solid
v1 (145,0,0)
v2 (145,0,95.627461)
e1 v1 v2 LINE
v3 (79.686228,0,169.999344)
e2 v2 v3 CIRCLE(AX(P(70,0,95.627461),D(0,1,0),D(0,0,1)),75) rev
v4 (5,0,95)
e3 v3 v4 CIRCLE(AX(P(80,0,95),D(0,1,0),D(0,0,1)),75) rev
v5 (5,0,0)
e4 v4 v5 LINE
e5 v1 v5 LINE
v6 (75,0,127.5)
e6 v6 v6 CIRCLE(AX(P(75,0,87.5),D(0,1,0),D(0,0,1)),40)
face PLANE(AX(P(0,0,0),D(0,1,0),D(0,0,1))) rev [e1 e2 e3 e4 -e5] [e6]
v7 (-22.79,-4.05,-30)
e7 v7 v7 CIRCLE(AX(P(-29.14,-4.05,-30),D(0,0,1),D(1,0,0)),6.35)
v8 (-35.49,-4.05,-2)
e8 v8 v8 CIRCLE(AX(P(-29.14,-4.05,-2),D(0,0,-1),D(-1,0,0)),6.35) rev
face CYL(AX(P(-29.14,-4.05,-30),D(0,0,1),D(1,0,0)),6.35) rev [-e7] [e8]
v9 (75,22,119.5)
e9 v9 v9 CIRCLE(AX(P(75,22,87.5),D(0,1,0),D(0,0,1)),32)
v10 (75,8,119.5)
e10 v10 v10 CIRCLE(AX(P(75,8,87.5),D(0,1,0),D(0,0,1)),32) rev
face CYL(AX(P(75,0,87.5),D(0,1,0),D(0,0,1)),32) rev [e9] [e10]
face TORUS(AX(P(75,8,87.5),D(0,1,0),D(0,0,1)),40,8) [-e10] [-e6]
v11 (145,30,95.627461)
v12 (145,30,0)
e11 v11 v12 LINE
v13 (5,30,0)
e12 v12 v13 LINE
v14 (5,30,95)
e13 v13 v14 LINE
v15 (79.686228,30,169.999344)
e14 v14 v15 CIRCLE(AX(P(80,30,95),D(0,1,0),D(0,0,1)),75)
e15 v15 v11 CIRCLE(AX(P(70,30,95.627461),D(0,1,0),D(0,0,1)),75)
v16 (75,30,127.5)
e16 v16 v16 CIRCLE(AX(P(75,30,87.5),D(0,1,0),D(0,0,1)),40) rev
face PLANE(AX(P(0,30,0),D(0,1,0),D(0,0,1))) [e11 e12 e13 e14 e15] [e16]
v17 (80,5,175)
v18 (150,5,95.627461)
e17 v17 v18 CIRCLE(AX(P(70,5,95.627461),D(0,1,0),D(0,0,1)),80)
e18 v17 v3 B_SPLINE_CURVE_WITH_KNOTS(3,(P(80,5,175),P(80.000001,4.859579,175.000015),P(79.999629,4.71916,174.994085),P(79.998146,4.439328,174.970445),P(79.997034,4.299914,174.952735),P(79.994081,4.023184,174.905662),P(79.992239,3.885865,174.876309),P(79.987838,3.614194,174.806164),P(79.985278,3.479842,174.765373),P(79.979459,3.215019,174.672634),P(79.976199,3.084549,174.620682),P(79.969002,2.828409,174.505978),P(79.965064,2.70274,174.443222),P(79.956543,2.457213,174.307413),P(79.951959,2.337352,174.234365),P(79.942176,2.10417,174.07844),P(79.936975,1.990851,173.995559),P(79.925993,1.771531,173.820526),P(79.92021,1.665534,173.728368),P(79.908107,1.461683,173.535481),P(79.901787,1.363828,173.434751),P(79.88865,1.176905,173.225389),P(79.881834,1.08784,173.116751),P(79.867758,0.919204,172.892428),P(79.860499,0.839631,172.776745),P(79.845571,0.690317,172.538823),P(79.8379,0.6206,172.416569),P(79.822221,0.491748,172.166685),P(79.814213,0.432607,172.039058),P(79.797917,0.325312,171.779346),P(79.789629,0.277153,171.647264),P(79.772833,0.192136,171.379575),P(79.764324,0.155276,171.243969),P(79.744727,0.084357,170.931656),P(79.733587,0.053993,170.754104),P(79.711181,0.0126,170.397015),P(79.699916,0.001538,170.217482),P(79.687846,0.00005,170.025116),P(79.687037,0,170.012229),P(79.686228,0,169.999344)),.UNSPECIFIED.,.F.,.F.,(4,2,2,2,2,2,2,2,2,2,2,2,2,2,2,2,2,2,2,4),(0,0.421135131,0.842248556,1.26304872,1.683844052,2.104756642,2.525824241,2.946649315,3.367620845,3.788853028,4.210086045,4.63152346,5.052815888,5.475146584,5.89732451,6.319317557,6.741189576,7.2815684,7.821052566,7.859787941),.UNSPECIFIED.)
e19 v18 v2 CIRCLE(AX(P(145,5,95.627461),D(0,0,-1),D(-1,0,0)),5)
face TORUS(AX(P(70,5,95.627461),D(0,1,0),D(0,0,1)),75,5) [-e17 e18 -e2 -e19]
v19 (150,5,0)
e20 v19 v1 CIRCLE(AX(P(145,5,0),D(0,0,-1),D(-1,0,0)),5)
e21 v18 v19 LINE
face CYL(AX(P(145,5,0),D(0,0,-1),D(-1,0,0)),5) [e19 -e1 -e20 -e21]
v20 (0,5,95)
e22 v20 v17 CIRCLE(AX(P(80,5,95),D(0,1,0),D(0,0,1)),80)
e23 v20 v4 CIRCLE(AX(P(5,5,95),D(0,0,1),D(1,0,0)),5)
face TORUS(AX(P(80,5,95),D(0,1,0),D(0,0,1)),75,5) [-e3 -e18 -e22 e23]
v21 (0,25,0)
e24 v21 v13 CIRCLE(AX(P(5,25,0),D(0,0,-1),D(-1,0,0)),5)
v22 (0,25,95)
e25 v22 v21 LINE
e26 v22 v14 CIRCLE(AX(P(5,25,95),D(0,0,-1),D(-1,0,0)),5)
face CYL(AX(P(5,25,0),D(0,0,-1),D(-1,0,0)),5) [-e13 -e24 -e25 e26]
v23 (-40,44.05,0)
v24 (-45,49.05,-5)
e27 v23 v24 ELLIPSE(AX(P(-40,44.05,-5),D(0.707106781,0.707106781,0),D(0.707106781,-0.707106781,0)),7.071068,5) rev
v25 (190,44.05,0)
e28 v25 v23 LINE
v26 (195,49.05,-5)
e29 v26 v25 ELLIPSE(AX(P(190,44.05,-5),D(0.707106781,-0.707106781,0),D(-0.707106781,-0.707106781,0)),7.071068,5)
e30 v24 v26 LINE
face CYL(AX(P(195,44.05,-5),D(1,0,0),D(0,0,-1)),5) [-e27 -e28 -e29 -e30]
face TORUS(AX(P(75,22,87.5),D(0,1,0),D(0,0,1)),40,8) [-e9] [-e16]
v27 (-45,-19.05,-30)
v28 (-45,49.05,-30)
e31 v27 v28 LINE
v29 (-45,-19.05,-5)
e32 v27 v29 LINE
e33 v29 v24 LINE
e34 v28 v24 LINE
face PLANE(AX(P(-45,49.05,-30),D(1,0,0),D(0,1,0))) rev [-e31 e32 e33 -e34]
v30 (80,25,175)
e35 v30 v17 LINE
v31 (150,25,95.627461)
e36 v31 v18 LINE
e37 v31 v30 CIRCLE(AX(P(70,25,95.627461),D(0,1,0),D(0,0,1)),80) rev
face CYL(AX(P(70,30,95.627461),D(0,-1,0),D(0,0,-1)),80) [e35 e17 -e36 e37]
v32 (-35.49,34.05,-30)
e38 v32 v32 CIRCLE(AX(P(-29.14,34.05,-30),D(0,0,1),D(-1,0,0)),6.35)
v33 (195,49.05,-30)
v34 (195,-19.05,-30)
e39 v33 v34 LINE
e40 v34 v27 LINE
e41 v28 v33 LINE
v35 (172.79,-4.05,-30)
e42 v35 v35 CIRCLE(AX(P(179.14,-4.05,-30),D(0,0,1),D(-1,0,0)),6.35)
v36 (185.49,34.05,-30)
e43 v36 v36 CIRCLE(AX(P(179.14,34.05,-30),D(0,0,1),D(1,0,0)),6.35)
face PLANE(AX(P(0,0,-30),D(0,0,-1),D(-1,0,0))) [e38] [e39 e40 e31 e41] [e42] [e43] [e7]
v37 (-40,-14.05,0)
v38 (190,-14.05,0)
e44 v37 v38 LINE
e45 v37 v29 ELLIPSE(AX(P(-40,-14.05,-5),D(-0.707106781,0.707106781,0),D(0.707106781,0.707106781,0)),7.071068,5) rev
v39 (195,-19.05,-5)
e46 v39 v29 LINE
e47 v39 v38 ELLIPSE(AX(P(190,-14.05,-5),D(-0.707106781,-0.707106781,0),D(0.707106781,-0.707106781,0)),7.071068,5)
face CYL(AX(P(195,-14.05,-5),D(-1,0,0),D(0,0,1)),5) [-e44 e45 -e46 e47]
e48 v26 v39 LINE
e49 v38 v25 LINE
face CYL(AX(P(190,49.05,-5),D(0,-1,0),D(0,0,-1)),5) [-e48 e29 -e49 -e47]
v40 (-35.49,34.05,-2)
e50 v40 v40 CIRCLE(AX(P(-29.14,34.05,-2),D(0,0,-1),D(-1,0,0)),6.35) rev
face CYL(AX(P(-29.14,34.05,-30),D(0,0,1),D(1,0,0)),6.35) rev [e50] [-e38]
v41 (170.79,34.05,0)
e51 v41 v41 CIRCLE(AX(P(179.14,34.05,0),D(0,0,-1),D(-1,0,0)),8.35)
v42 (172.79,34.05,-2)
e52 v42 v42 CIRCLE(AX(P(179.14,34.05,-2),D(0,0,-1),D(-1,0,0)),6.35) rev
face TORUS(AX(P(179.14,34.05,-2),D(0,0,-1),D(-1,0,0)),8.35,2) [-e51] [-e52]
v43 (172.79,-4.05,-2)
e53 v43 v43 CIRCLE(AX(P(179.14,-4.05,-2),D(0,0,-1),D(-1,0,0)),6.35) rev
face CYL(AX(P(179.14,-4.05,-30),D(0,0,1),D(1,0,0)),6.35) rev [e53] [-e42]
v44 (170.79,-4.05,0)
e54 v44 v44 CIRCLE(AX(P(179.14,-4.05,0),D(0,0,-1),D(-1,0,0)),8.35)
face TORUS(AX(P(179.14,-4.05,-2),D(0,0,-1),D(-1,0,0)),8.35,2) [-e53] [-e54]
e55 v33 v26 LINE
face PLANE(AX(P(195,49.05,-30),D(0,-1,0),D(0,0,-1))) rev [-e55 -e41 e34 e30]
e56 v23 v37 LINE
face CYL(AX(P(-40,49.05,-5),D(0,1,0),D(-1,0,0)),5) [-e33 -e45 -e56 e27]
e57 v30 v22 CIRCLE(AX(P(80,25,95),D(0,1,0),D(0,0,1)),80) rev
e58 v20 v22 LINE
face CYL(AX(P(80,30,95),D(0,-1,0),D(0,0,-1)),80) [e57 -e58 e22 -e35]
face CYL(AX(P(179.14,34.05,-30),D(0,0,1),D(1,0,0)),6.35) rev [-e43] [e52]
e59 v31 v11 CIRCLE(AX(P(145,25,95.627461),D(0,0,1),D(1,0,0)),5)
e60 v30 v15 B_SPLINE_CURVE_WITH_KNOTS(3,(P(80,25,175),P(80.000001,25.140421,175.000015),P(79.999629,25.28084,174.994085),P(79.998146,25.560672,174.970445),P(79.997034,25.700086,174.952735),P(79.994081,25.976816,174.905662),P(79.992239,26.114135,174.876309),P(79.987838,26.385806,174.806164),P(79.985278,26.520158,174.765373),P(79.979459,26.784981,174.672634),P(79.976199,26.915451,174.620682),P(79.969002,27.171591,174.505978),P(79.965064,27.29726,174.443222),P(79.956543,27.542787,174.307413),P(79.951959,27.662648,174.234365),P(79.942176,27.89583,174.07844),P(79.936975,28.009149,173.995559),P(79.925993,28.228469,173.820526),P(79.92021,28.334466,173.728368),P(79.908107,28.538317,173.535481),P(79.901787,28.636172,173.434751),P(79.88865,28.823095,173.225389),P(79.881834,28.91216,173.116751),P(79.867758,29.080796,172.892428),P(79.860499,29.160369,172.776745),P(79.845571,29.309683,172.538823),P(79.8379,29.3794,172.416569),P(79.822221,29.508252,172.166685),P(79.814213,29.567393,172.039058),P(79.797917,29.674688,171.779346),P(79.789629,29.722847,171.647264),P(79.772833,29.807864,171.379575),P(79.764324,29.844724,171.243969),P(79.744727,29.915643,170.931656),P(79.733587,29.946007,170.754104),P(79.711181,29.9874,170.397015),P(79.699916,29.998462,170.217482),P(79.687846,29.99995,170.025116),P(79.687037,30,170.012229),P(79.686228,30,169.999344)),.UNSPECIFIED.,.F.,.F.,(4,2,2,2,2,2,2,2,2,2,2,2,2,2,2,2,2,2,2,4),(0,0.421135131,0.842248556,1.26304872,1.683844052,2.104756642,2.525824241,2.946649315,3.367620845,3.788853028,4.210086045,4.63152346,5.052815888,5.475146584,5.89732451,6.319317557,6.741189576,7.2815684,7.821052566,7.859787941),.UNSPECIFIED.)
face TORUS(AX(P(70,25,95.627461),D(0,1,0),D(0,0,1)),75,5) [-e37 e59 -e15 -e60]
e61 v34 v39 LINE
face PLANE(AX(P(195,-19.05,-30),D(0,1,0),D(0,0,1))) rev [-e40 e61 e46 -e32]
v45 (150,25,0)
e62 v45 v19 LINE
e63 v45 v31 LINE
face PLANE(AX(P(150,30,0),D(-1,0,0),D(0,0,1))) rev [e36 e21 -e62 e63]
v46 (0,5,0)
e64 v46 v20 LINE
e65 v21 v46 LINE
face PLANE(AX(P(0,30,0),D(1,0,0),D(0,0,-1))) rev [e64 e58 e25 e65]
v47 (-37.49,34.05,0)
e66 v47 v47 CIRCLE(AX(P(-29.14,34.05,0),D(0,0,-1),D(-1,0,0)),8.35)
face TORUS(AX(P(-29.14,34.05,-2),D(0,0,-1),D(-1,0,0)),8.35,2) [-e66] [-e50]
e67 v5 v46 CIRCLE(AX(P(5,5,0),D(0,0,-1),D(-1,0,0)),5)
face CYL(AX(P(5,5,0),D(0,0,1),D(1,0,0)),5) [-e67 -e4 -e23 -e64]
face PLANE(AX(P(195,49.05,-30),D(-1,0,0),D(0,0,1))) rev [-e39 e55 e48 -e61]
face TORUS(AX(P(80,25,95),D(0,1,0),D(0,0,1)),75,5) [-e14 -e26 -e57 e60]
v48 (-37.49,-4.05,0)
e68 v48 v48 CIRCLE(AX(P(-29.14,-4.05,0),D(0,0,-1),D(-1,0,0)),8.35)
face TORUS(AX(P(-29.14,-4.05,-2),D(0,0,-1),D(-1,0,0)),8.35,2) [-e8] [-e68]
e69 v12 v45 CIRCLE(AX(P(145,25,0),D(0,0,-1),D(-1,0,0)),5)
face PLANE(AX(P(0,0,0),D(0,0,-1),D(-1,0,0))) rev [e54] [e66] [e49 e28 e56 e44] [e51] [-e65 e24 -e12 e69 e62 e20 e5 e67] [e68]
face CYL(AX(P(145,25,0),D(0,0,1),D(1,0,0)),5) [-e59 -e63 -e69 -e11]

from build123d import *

# Parameters (mm, degrees)
SKETCH1_W           = 150
SKETCH1_H           = 175
BOSS_EXTRUDE1_DEPTH = 30
SKETCH3_R           = 32
CUT_EXTRUDE2_DEPTH  = 233.432785983
FILLET1_R           = 80
FILLET2_R           = 80
FILLET3_R           = 8
FILLET4_R           = 8
SKETCH5_W           = 240
SKETCH5_H           = 68.1
BOSS_EXTRUDE5_DEPTH = 30
FILLET5_R           = 5
FILLET6_R           = 5
SKETCH7_R           = 6.35
CUT_EXTRUDE3_DEPTH  = 267.563130487
FILLET7_R           = 2


with BuildPart() as part:
    # Sketch1 → Boss-Extrude1 (new body)
    with BuildSketch(Plane(origin=(0, 0, 0), x_dir=(1, 0, 0), z_dir=(0, 1, 0))):
        with Locations((75, -87.5)):
            Rectangle(SKETCH1_W, SKETCH1_H)
    extrude(amount=BOSS_EXTRUDE1_DEPTH)

    # Sketch3 → Cut-Extrude2 (cut, through all)
    with BuildSketch(Plane(origin=(0, 30, 0), x_dir=(-1, 0, 0), z_dir=(0, 1, 0))):
        with Locations(Location((-75, 87.5, 0), (0, 0, 90))):
            Circle(SKETCH3_R)
    extrude(amount=-CUT_EXTRUDE2_DEPTH, mode=Mode.SUBTRACT)

    # Fillet1
    fillet1_edges = [part.edges().sort_by_distance(p)[0] for p in [
        (0, 15, 175),
    ]]
    fillet(fillet1_edges, radius=FILLET1_R)

    # Fillet2
    # the kernel refuses this fillet: 80 mm, written as the material it takes off along each edge
    with BuildSketch(Plane(origin=(150, -198.43134833, 175), x_dir=(-1, 0, 0), z_dir=(0, 1, 0))) as fillet2_piece_1:
        with BuildLine():
            CenterArc((80, -79.372539332), FILLET2_R, 97.180755781, 82.819244219)
            Line((0, -79.372539332), (-1.6, -79.372539332))
            Line((-1.6, -79.372539332), (-1.6, 0))
            Line((-1.6, 0), (0, 1.6))
            ThreePointArc((0, 1.6), (35, 1.6), (69.8, 1.587450787))
            Line((69.8, 1.587450787), (70, 0))
        make_face()
    extrude(amount=426.86269666, mode=Mode.SUBTRACT)

    # Fillet3
    fillet3_edges = [part.edges().sort_by_distance(p)[0] for p in [
        (75, 30, 55.5),
    ]]
    fillet(fillet3_edges, radius=FILLET3_R)

    # Fillet4
    fillet4_edges = [part.edges().sort_by_distance(p)[0] for p in [
        (75, 0, 55.5),
    ]]
    fillet(fillet4_edges, radius=FILLET4_R)

    # Sketch5 → Boss-Extrude5 (add)
    with BuildSketch(Plane(origin=(0, 0, 0), x_dir=(-1, 0, 0), z_dir=(0, 0, -1))):
        with Locations((-75, 15)):
            Rectangle(SKETCH5_W, SKETCH5_H)
    extrude(amount=BOSS_EXTRUDE5_DEPTH)

    # Fillet5
    fillet5_edges = [part.edges().sort_by_distance(p)[0] for p in [
        (195, 15, 0),
        (75, -19.05, 0),
        (-45, 15, 0),
        (75, 49.05, 0),
    ]]
    fillet(fillet5_edges, radius=FILLET5_R)

    # Fillet6
    # the kernel refuses this fillet: 5 mm, written as the material it takes off along each edge
    with BuildSketch(Plane(origin=(80, 0, 95), x_dir=(-1, 0, 0), z_dir=(0, 0, -1))) as fillet6_piece_1:
        with BuildLine():
            CenterArc((80 - FILLET6_R, FILLET6_R), FILLET6_R, 270, 90)
            Line((80, FILLET6_R), (80, 0))
            Line((80, 0), (80 - FILLET6_R, 0))
        make_face()
    revolve(axis=Axis((80, 0, 95), (0, 1, 0)), revolution_arc=134.780309137, mode=Mode.SUBTRACT)
    with BuildSketch(Plane(origin=(80, 30, 95), x_dir=(-1, 0, 0), z_dir=(0, 0, -1))) as fillet6_piece_2:
        with BuildLine():
            CenterArc((80 - FILLET6_R, -FILLET6_R), FILLET6_R, 0, 90)
            Line((80, -FILLET6_R), (80, 0))
            Line((80, 0), (80 - FILLET6_R, 0))
        make_face()
    revolve(axis=Axis((80, 30, 95), (0, 1, 0)), revolution_arc=134.780309137, mode=Mode.SUBTRACT)
    with BuildSketch(Plane(origin=(150, 0, 0), x_dir=(-1, 0, 0), z_dir=(0, 0, 1)), Plane(origin=(150, 30, 0), x_dir=(0, -1, 0), z_dir=(0, 0, 1))) as fillet6_piece_3:
        with BuildLine():
            CenterArc((FILLET6_R, -FILLET6_R), FILLET6_R, 90, 90)
            Line((0, -FILLET6_R), (0, 0))
            Line((0, 0), (FILLET6_R, 0))
        make_face()
    extrude(amount=95.627460668, mode=Mode.SUBTRACT)
    with BuildSketch(Plane(origin=(70, 0, 95.627460668), x_dir=(1, 0, 0), z_dir=(0, 0, -1))) as fillet6_piece_4:
        with BuildLine():
            CenterArc((80 - FILLET6_R, -FILLET6_R), FILLET6_R, 0, 90)
            Line((80, -FILLET6_R), (80, 0))
            Line((80, 0), (80 - FILLET6_R, 0))
        make_face()
    revolve(axis=Axis((70, 0, 95.627460668), (0, -1, 0)), revolution_arc=127.596797833, mode=Mode.SUBTRACT)
    with BuildSketch(Plane(origin=(70, 30, 95.627460668), x_dir=(1, 0, 0), z_dir=(0, 0, -1))) as fillet6_piece_5:
        with BuildLine():
            CenterArc((80 - FILLET6_R, FILLET6_R), FILLET6_R, 270, 90)
            Line((80, FILLET6_R), (80, 0))
            Line((80, 0), (80 - FILLET6_R, 0))
        make_face()
    revolve(axis=Axis((70, 30, 95.627460668), (0, -1, 0)), revolution_arc=127.596797833, mode=Mode.SUBTRACT)
    with BuildSketch(Plane(origin=(0, 30, 95), x_dir=(1, 0, 0), z_dir=(0, 0, -1))) as fillet6_piece_6:
        with BuildLine():
            CenterArc((FILLET6_R, FILLET6_R), FILLET6_R, 180, 90)
            Line((0, FILLET6_R), (0, 0))
            Line((0, 0), (FILLET6_R, 0))
        make_face()
    extrude(amount=95, mode=Mode.SUBTRACT)
    with BuildSketch(Plane(origin=(0, 0, 95), x_dir=(1, 0, 0), z_dir=(0, 0, -1))) as fillet6_piece_7:
        with BuildLine():
            CenterArc((FILLET6_R, -FILLET6_R), FILLET6_R, 90, 90)
            Line((0, -FILLET6_R), (0, 0))
            Line((0, 0), (FILLET6_R, 0))
        make_face()
    extrude(amount=95, mode=Mode.SUBTRACT)

    # Sketch7 → Cut-Extrude3 (cut, through all)
    with BuildSketch(Plane.XY):
        with Locations((179.14, 34.05)):
            Circle(SKETCH7_R)
        with Locations(Location((179.14, -4.05, 0), (0, 0, 180))):
            Circle(SKETCH7_R)
        with Locations(Location((-29.14, 34.05, 0), (0, 0, 180))):
            Circle(SKETCH7_R)
        with Locations((-29.14, -4.05)):
            Circle(SKETCH7_R)
    extrude(amount=-CUT_EXTRUDE3_DEPTH, mode=Mode.SUBTRACT)

    # Fillet7
    fillet7_edges = [part.edges().sort_by_distance(p)[0] for p in [
        (-22.79, 34.05, 0),
        (-35.49, -4.05, 0),
        (172.79, 34.05, 0),
        (185.49, -4.05, 0),
    ]]
    fillet(fillet7_edges, radius=FILLET7_R)


solid = part.part
